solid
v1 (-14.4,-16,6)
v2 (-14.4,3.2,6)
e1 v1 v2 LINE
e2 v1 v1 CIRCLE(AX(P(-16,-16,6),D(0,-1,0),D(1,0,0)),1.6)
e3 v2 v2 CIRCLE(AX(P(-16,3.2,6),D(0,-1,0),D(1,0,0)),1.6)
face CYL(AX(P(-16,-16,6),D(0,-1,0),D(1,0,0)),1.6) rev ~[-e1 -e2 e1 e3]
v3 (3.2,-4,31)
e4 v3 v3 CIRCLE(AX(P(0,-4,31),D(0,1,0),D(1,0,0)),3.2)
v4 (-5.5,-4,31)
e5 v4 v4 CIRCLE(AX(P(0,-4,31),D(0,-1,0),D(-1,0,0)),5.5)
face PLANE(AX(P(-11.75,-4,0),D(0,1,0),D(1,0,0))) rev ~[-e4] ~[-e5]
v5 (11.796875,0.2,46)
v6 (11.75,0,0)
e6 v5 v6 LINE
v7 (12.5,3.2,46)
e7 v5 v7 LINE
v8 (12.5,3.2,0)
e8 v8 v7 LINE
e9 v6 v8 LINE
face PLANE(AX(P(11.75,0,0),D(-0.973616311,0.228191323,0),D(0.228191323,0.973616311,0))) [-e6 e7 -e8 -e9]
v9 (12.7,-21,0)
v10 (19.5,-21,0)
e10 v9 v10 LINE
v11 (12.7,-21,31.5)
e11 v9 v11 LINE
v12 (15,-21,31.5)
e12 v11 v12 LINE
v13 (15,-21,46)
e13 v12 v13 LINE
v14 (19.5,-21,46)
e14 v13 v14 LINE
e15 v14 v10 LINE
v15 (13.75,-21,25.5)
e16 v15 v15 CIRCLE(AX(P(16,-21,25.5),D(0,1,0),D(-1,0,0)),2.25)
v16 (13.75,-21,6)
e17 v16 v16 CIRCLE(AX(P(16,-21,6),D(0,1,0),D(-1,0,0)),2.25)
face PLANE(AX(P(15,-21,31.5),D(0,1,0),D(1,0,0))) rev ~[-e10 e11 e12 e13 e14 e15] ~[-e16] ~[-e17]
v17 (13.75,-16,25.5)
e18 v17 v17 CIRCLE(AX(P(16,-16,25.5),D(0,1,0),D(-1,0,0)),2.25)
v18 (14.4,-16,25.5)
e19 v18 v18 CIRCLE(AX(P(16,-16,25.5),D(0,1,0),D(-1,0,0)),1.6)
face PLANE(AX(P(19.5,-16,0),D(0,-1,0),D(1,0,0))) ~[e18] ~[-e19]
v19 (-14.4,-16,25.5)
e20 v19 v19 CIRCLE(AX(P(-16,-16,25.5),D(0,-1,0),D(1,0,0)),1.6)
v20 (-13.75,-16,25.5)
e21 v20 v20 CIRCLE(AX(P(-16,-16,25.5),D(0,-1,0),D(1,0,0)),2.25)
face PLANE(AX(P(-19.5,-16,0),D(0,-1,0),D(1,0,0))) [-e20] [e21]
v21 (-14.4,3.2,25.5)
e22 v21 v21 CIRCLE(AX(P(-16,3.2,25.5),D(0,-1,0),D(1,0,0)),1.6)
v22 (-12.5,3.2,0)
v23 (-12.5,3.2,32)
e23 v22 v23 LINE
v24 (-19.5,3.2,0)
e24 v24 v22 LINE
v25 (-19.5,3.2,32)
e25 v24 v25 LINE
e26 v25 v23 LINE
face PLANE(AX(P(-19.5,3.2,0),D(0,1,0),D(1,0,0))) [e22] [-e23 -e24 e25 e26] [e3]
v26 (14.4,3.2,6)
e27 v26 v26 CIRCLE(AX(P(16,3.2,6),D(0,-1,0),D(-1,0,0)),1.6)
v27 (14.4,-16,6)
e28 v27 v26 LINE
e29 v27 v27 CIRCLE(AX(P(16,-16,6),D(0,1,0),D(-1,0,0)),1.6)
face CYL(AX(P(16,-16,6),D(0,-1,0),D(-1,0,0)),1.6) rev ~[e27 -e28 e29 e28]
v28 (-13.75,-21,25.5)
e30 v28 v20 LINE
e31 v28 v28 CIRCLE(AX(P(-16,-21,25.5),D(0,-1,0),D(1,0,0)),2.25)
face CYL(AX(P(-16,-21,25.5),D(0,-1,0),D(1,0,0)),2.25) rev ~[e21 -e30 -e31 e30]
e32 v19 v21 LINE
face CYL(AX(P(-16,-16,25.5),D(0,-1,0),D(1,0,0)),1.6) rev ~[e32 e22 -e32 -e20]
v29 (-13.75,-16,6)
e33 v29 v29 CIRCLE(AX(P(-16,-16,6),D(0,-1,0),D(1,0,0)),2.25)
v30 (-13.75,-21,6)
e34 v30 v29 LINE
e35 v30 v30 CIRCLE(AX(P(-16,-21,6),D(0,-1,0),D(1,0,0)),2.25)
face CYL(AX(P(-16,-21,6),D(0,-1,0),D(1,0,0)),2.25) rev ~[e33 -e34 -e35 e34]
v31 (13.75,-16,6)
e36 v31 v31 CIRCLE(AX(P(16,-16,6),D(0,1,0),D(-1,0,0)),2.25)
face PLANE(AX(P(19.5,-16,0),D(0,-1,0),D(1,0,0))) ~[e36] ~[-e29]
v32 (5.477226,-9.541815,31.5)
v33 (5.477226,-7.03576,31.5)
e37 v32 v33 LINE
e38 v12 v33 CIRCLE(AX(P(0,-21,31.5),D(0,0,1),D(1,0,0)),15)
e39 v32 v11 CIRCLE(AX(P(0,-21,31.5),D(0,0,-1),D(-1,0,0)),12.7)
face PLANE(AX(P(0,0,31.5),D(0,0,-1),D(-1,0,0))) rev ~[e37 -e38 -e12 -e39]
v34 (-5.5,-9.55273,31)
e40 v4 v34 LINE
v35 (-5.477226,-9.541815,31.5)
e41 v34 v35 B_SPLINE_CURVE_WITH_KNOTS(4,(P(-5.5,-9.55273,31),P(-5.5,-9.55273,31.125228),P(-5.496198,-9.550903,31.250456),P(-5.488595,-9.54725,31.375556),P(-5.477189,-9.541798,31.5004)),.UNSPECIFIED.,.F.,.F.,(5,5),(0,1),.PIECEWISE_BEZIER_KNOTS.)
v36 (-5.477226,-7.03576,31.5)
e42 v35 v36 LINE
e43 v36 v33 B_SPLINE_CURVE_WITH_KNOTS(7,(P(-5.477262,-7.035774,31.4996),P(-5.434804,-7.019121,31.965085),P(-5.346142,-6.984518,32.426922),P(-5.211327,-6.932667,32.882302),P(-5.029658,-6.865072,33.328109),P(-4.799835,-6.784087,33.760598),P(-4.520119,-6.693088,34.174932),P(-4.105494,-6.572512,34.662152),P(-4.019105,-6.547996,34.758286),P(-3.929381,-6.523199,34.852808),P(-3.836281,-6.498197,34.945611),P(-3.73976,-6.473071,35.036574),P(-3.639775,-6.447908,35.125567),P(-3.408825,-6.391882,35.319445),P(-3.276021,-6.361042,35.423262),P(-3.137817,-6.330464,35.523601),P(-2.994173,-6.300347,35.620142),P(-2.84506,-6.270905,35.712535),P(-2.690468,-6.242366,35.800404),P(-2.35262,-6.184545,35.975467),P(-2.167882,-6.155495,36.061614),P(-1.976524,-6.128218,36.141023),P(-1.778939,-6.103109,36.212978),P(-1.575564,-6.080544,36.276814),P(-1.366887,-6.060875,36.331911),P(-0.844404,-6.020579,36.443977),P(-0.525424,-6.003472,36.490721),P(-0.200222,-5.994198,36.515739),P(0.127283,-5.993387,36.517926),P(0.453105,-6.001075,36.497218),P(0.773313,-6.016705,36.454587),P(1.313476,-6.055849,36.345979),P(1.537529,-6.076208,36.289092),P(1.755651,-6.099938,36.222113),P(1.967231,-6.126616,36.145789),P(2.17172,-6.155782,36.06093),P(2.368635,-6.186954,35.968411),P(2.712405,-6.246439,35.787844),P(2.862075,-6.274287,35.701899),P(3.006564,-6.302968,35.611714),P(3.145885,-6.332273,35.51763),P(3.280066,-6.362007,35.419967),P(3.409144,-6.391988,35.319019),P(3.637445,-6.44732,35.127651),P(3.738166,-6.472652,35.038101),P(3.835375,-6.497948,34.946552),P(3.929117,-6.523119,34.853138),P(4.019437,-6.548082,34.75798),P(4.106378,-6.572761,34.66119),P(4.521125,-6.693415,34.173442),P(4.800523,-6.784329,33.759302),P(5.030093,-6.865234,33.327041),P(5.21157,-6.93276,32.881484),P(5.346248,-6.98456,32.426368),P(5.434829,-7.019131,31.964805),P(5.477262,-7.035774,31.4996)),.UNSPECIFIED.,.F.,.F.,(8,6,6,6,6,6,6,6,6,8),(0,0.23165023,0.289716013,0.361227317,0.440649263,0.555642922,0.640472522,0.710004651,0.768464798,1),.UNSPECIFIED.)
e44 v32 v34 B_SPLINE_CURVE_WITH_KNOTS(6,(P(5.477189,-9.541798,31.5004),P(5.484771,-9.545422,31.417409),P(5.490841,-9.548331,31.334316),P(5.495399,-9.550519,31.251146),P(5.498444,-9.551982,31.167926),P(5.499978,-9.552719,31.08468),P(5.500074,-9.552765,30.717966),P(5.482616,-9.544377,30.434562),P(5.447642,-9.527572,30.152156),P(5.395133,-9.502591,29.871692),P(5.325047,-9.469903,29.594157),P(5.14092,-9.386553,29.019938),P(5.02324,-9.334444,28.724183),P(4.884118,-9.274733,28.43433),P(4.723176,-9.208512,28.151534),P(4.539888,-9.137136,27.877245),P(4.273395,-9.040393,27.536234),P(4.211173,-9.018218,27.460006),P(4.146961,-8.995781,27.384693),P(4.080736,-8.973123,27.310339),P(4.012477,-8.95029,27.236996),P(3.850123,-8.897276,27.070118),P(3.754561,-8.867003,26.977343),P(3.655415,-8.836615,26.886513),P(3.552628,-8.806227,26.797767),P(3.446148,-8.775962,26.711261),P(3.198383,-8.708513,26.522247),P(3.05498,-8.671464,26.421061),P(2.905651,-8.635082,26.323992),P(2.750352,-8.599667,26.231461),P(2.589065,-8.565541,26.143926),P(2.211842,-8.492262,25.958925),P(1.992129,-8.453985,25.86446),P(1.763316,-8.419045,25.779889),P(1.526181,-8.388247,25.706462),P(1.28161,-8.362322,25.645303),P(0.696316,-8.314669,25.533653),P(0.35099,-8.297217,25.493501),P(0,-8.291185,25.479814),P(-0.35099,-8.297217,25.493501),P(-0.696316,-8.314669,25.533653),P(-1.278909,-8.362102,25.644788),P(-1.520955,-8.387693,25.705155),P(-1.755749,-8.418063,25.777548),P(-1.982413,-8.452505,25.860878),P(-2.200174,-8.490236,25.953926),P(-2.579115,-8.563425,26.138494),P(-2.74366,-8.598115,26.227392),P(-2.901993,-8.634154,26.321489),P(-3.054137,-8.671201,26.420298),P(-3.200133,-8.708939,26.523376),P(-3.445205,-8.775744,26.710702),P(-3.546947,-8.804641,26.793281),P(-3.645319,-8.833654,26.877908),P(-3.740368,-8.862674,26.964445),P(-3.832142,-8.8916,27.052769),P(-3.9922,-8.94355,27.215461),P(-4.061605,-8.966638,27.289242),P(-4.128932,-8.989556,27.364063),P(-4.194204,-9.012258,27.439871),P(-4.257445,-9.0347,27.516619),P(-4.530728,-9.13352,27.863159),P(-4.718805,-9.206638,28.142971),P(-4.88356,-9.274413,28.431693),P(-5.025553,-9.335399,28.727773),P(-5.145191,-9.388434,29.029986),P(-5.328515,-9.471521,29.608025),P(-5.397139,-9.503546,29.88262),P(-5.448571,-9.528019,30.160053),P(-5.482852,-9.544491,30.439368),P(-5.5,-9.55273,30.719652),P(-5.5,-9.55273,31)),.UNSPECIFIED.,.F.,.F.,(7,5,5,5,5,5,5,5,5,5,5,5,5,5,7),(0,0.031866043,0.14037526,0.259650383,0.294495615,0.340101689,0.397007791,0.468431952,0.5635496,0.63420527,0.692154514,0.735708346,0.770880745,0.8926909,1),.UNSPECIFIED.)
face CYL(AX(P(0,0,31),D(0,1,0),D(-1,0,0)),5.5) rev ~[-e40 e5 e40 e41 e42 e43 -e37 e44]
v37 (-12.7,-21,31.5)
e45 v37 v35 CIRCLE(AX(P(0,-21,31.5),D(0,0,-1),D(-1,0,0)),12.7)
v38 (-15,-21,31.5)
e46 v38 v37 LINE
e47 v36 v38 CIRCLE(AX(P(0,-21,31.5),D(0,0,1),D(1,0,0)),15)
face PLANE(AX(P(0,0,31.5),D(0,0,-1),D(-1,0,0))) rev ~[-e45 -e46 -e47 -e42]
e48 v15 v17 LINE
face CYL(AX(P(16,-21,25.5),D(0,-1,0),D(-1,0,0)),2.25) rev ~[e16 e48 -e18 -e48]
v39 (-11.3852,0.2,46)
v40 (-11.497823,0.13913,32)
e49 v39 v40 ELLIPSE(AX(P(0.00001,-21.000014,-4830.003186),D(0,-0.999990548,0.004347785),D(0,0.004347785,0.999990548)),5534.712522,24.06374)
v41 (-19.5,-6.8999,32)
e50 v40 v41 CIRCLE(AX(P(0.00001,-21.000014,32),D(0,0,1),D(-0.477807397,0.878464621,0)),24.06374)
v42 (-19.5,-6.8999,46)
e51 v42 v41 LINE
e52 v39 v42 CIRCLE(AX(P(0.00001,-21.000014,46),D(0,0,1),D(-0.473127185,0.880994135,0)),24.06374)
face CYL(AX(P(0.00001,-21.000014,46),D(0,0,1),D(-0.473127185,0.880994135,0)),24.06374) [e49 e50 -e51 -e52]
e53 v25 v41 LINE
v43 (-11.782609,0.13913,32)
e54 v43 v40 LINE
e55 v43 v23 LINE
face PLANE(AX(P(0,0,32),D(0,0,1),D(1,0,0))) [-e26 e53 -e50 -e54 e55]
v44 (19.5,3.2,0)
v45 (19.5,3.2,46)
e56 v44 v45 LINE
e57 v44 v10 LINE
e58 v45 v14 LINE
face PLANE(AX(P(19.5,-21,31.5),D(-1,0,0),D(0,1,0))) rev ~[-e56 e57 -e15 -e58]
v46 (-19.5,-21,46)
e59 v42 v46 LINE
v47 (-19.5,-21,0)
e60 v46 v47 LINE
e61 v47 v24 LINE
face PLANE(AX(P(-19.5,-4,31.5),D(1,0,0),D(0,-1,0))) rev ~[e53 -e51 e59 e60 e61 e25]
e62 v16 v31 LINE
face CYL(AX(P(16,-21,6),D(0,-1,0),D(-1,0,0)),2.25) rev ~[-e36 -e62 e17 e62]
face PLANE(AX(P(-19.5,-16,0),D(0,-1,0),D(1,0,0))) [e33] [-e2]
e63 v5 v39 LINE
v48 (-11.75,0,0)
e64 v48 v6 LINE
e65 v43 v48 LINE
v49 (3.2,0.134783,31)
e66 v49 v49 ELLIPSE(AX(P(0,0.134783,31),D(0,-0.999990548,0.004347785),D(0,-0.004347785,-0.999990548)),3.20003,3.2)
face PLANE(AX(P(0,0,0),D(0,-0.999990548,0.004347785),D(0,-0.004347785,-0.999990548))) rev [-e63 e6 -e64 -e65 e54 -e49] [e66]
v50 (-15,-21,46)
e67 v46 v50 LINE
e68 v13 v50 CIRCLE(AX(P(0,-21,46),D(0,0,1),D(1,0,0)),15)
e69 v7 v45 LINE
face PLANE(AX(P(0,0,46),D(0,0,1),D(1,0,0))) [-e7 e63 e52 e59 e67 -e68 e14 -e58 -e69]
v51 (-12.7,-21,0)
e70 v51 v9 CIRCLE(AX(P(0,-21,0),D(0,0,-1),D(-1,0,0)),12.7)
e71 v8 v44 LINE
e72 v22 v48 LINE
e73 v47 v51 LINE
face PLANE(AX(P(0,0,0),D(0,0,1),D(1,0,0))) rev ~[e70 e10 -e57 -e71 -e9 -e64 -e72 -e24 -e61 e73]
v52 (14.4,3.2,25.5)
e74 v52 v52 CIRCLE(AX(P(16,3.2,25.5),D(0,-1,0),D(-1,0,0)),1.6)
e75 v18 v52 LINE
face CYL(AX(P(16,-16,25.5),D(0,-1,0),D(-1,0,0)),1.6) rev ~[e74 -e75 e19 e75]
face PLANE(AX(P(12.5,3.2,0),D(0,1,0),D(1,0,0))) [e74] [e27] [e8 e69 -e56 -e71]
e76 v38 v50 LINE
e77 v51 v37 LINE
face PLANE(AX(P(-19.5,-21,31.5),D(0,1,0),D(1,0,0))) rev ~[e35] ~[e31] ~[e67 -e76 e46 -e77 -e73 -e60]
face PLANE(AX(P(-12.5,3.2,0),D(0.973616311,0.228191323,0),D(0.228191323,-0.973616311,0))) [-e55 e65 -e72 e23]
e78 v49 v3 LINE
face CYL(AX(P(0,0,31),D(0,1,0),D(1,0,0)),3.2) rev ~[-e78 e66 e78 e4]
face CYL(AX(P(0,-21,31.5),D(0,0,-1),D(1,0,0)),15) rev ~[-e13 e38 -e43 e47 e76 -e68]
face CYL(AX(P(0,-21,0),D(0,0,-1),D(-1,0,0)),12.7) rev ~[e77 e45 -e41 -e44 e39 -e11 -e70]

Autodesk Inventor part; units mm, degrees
ref_plane "YZ Plane" through (0, 0, 0) normal (1, 0, 0) x (0, 1, 0)
ref_plane "XZ Plane" through (0, 0, 0) normal (0, 1, 0) x (-1, 0, 0)
ref_plane "XY Plane" through (0, 0, 0) normal (0, 0, 1) x (1, 0, 0)
sketch "スケッチ1" plane through (0, 0, 0) normal (0, 0, 1) x (1, 0, 0)
  line L0 (-12.5, 3.2) -> (-11.75, 0)
  line L1 (-11.75, 0) -> (11.75, 0)
  line L2 (11.75, 0) -> (12.5, 3.2)
  line L3 (12.5, 3.2) -> (19.5, 3.2)
  line L4 (19.5, 3.2) -> (19.5, -4)
  line L5 (19.5, -4) -> (-19.5, -4)
  line L6 (-19.5, -4) -> (-19.5, 3.2)
  line L7 (-19.5, 3.2) -> (-12.5, 3.2)
  circle A0 centre (0, -21) radius 12.7 construction
  line L8 (-5.5, -4) -> (5.5, -4) construction
  line L9 (5.5, -4) -> (5.5, -7.5) construction
  line L10 (5.5, -7.5) -> (-5.5, -7.5) construction
  line L11 (-5.5, -7.5) -> (-5.5, -4) construction
  circle A1 centre (0, -21) radius 14.7 construction
  line L12 (-19.5, -21) -> (19.5, -21) construction
  line L13 (-18.75, -24.8) -> (-13.25, -24.8) construction
  line L14 (-13.25, -24.8) -> (-13.25, -27.8) construction
  line L15 (-13.25, -27.8) -> (-18.75, -27.8) construction
  line L16 (-18.75, -27.8) -> (-18.75, -24.8) construction
  line L17 (-16, -27.8) -> (-16, -14.8) construction
  line L18 (-18.75, -14.8) -> (-13.25, -14.8) construction
  line L19 (-13.25, -14.8) -> (-13.25, -17.2) construction
  line L20 (-13.25, -17.2) -> (-18.75, -17.2) construction
  line L21 (-18.75, -17.2) -> (-18.75, -14.8) construction
  line L22 (-14.5, -14.8) -> (-14.5, -27.8) construction
  line L23 (-17.5, -14.8) -> (-17.5, -27.8) construction
  point P0 (0, 0)
  point P1 (0, 0)
  point P2 (0, -4)
  dimension "d0" = 4
  dimension "d1" = 3.2
  dimension "d2" = 23.5
  dimension "d3" = 25
  dimension "d4" = 39
  dimension "d5" = 25.4
  dimension "d6" = 3.5
  dimension "d7" = 21
  dimension "d8" = 11
  dimension "d9" = 2
  dimension "d11" = 5.5
  dimension "d12" = 3
  dimension "d13" = 5.5
  dimension "d14" = 2.4
  dimension "d15" = 10
  dimension "d16" = 1.5
  dimension "d17" = 1.5
  dimension "d18" = 3.8
  dimension "d19" = 16
extrude "押し出し1" add sketch "スケッチ1" along normal blind 46
sketch "スケッチ2" plane through (0, 0, 0) normal (0, 0, -1) x (-1, 0, 0)
  line L0 (19.5, -4) -> (-19.5, -4) projected
  circle A0 centre (0, -21) radius 12.7 projected
  line L1 (19.5, -21) -> (-19.5, -21) projected
  line L2 (-19.5, -21) -> (-19.5, -4)
  line L3 (19.5, -4) -> (19.5, -21)
  point P0 (0, 0)
  point P1 (-12.7, -21)
  point P2 (12.7, -21)
extrude "押し出し2" add sketch "スケッチ2" against normal blind 31.5 contours L3 L1 A0 L2 L0
sketch "スケッチ3" plane through (0, 0, 31.5) normal (0, 0, 1) x (1, 0, 0)
  line L0 (-19.5, -4) -> (19.5, -4) projected
  line L1 (-19.5, -4) -> (-19.5, -21) projected
  line L2 (-19.5, -21) -> (-12.7, -21) projected
  arc A0 (12.7, -21) -> (-12.7, -21) centre (0, -21) ccw projected
  line L3 (12.7, -21) -> (19.5, -21) projected
  line L4 (19.5, -21) -> (19.5, -4) projected
  circle A1 centre (0, -21) radius 15
  point P0 (0, 0)
  point P1 (-15, -21)
  point P2 (15, -21)
  dimension "d24" = 30
extrude "押し出し3" add sketch "スケッチ3" along normal up to surface (14.5 mm away) contours L0 L4 L3 A1 L2 L1
sketch "スケッチ5" plane through (0, 0, 0) normal (0, 1, 0) x (-1, 0, 0)
  circle A0 centre (0, 31) radius 5.5
  line L0 (-11.75, 46) -> (11.75, 46) projected
  point P0 (0, 0)
  point P1 (0, 46)
  dimension "d27" = 15
  dimension "d28" = 11
extrude "押し出し4" cut sketch "スケッチ5" along normal through all both and the other way through all
sketch "スケッチ6" plane through (-11.75, 0, 0) normal (0, 1, 0) x (1, 0, 0)
  circle A0 centre (11.75, -31) radius 5.5 projected
  circle A1 centre (11.75, -31) radius 3.2
  point P0 (11.75, 0)
  dimension "d31" = 6.4
extrude "押し出し5" add sketch "スケッチ6" against normal blind 4
sketch "スケッチ7" plane through (-19.5, -21, 0) normal (0, -1, 0) x (1, 0, 0)
  line L0 (6.8, 0) -> (0, 0) construction
  line L1 (6.8, 0) -> (6.8, 31.5) construction
  line L2 (4.5, 31.5) -> (6.8, 31.5) construction
  line L3 (4.5, 31.5) -> (4.5, 46) construction
  line L4 (4.5, 46) -> (0, 46) construction
  line L5 (0, 0) -> (0, 46) construction
  line L6 (3.5, 0) -> (3.5, 31.5) construction
  circle A0 centre (3.5, 6) radius 2.25
  circle A1 centre (3.5, 25.5) radius 2.25
  point P0 (19.5, 0)
  dimension "d34" = 16
  dimension "d35" = 4.5
  dimension "d36" = 6
  dimension "d37" = 6
extrude "押し出し6" cut sketch "スケッチ7" against normal blind 5
sketch "スケッチ8" plane through (-16, -16, 6) normal (0, -1, 0) x (1, 0, 0)
  circle A0 centre (0, 0) radius 2.25 projected
  circle A1 centre (0, 19.5) radius 2.25 projected
  circle A2 centre (0, 0) radius 1.6
  circle A3 centre (0, 19.5) radius 1.6
  point P0 (16, -6)
  dimension "d40" = 3.2
extrude "押し出し7" cut sketch "スケッチ8" against normal through all contours A2 | A3
mirror "ミラー1" about plane through (0, 0, 0) normal (1, 0, 0) of "押し出し7", "押し出し6"
sketch "スケッチ9" plane through (-11.75, 0, 0) normal (0, 1, 0) x (1, 0, 0)
  line L0 (-7.75, -46) -> (3.9203, -46)
  line L1 (3.9203, -46) -> (3.9203, -32)
  line L2 (3.9203, -32) -> (-7.75, -32)
  line L3 (-7.75, -32) -> (-7.75, -46)
  point P0 (11.75, 0)
  dimension "d43" = 14
extrude "押し出し8" cut sketch "スケッチ9" along normal blind 10
sketch "スケッチ10" plane through (0, 0, 0) normal (1, 0, 0) x (0, 1, 0)
  line L0 (0, 0) -> (0, 46) projected
  line L1 (3.2, 46) -> (-21, 46) projected
  line L2 (3.2, 0) -> (-21, 0) projected
  line L3 (0, 0) -> (0.2, 46)
  dimension "d46" = 0.2
extrude "押し出し9" add sketch "スケッチ10" along normal up to surface surface through (12.5, 3.2, 0) normal (-0.9736163, 0.2281913, 0)
mirror "ミラー2" about plane through (0, 0, 0) normal (1, 0, 0) of "押し出し9"
sketch "スケッチ11" plane through (0, -4, 31) normal (0, -1, 0) x (1, 0, 0)
  circle A0 centre (0, 0) radius 3.2 projected
  point P0 (0, -31)
extrude "押し出し10" cut sketch "スケッチ11" against normal through all
sketch "スケッチ12" plane through (0, 0, 46) normal (0, 0, 1) x (1, 0, 0)
  arc A0 (15, -21) -> (-15, -21) centre (0, -21) ccw projected
  arc A1 (-11.3852, 0.2) -> (-19.5, -6.8999) centre (0, -21) ccw
  line L0 (-19.5, 0) -> (-19.5, -21) projected
  line L1 (-19.5, 0) -> (-19.5, 3.2) projected
  line L2 (-19.5, 3.2) -> (-12.5, 3.2) projected
  line L3 (-12.5, 3.2) -> (-11.7826, 0.1391) projected
  line L4 (11.7969, 0.2) -> (-11.7969, 0.2) projected
  point P0 (0, 0)
  point P1 (-11.75, 0)
extrude "押し出し11" cut sketch "スケッチ12" against normal up to surface (14 mm away)
equation "\"d17\" = d16"
equation "\"d32\" = d0"
equation "\"d34\" = d19"
properties part number "led_holder_01"
